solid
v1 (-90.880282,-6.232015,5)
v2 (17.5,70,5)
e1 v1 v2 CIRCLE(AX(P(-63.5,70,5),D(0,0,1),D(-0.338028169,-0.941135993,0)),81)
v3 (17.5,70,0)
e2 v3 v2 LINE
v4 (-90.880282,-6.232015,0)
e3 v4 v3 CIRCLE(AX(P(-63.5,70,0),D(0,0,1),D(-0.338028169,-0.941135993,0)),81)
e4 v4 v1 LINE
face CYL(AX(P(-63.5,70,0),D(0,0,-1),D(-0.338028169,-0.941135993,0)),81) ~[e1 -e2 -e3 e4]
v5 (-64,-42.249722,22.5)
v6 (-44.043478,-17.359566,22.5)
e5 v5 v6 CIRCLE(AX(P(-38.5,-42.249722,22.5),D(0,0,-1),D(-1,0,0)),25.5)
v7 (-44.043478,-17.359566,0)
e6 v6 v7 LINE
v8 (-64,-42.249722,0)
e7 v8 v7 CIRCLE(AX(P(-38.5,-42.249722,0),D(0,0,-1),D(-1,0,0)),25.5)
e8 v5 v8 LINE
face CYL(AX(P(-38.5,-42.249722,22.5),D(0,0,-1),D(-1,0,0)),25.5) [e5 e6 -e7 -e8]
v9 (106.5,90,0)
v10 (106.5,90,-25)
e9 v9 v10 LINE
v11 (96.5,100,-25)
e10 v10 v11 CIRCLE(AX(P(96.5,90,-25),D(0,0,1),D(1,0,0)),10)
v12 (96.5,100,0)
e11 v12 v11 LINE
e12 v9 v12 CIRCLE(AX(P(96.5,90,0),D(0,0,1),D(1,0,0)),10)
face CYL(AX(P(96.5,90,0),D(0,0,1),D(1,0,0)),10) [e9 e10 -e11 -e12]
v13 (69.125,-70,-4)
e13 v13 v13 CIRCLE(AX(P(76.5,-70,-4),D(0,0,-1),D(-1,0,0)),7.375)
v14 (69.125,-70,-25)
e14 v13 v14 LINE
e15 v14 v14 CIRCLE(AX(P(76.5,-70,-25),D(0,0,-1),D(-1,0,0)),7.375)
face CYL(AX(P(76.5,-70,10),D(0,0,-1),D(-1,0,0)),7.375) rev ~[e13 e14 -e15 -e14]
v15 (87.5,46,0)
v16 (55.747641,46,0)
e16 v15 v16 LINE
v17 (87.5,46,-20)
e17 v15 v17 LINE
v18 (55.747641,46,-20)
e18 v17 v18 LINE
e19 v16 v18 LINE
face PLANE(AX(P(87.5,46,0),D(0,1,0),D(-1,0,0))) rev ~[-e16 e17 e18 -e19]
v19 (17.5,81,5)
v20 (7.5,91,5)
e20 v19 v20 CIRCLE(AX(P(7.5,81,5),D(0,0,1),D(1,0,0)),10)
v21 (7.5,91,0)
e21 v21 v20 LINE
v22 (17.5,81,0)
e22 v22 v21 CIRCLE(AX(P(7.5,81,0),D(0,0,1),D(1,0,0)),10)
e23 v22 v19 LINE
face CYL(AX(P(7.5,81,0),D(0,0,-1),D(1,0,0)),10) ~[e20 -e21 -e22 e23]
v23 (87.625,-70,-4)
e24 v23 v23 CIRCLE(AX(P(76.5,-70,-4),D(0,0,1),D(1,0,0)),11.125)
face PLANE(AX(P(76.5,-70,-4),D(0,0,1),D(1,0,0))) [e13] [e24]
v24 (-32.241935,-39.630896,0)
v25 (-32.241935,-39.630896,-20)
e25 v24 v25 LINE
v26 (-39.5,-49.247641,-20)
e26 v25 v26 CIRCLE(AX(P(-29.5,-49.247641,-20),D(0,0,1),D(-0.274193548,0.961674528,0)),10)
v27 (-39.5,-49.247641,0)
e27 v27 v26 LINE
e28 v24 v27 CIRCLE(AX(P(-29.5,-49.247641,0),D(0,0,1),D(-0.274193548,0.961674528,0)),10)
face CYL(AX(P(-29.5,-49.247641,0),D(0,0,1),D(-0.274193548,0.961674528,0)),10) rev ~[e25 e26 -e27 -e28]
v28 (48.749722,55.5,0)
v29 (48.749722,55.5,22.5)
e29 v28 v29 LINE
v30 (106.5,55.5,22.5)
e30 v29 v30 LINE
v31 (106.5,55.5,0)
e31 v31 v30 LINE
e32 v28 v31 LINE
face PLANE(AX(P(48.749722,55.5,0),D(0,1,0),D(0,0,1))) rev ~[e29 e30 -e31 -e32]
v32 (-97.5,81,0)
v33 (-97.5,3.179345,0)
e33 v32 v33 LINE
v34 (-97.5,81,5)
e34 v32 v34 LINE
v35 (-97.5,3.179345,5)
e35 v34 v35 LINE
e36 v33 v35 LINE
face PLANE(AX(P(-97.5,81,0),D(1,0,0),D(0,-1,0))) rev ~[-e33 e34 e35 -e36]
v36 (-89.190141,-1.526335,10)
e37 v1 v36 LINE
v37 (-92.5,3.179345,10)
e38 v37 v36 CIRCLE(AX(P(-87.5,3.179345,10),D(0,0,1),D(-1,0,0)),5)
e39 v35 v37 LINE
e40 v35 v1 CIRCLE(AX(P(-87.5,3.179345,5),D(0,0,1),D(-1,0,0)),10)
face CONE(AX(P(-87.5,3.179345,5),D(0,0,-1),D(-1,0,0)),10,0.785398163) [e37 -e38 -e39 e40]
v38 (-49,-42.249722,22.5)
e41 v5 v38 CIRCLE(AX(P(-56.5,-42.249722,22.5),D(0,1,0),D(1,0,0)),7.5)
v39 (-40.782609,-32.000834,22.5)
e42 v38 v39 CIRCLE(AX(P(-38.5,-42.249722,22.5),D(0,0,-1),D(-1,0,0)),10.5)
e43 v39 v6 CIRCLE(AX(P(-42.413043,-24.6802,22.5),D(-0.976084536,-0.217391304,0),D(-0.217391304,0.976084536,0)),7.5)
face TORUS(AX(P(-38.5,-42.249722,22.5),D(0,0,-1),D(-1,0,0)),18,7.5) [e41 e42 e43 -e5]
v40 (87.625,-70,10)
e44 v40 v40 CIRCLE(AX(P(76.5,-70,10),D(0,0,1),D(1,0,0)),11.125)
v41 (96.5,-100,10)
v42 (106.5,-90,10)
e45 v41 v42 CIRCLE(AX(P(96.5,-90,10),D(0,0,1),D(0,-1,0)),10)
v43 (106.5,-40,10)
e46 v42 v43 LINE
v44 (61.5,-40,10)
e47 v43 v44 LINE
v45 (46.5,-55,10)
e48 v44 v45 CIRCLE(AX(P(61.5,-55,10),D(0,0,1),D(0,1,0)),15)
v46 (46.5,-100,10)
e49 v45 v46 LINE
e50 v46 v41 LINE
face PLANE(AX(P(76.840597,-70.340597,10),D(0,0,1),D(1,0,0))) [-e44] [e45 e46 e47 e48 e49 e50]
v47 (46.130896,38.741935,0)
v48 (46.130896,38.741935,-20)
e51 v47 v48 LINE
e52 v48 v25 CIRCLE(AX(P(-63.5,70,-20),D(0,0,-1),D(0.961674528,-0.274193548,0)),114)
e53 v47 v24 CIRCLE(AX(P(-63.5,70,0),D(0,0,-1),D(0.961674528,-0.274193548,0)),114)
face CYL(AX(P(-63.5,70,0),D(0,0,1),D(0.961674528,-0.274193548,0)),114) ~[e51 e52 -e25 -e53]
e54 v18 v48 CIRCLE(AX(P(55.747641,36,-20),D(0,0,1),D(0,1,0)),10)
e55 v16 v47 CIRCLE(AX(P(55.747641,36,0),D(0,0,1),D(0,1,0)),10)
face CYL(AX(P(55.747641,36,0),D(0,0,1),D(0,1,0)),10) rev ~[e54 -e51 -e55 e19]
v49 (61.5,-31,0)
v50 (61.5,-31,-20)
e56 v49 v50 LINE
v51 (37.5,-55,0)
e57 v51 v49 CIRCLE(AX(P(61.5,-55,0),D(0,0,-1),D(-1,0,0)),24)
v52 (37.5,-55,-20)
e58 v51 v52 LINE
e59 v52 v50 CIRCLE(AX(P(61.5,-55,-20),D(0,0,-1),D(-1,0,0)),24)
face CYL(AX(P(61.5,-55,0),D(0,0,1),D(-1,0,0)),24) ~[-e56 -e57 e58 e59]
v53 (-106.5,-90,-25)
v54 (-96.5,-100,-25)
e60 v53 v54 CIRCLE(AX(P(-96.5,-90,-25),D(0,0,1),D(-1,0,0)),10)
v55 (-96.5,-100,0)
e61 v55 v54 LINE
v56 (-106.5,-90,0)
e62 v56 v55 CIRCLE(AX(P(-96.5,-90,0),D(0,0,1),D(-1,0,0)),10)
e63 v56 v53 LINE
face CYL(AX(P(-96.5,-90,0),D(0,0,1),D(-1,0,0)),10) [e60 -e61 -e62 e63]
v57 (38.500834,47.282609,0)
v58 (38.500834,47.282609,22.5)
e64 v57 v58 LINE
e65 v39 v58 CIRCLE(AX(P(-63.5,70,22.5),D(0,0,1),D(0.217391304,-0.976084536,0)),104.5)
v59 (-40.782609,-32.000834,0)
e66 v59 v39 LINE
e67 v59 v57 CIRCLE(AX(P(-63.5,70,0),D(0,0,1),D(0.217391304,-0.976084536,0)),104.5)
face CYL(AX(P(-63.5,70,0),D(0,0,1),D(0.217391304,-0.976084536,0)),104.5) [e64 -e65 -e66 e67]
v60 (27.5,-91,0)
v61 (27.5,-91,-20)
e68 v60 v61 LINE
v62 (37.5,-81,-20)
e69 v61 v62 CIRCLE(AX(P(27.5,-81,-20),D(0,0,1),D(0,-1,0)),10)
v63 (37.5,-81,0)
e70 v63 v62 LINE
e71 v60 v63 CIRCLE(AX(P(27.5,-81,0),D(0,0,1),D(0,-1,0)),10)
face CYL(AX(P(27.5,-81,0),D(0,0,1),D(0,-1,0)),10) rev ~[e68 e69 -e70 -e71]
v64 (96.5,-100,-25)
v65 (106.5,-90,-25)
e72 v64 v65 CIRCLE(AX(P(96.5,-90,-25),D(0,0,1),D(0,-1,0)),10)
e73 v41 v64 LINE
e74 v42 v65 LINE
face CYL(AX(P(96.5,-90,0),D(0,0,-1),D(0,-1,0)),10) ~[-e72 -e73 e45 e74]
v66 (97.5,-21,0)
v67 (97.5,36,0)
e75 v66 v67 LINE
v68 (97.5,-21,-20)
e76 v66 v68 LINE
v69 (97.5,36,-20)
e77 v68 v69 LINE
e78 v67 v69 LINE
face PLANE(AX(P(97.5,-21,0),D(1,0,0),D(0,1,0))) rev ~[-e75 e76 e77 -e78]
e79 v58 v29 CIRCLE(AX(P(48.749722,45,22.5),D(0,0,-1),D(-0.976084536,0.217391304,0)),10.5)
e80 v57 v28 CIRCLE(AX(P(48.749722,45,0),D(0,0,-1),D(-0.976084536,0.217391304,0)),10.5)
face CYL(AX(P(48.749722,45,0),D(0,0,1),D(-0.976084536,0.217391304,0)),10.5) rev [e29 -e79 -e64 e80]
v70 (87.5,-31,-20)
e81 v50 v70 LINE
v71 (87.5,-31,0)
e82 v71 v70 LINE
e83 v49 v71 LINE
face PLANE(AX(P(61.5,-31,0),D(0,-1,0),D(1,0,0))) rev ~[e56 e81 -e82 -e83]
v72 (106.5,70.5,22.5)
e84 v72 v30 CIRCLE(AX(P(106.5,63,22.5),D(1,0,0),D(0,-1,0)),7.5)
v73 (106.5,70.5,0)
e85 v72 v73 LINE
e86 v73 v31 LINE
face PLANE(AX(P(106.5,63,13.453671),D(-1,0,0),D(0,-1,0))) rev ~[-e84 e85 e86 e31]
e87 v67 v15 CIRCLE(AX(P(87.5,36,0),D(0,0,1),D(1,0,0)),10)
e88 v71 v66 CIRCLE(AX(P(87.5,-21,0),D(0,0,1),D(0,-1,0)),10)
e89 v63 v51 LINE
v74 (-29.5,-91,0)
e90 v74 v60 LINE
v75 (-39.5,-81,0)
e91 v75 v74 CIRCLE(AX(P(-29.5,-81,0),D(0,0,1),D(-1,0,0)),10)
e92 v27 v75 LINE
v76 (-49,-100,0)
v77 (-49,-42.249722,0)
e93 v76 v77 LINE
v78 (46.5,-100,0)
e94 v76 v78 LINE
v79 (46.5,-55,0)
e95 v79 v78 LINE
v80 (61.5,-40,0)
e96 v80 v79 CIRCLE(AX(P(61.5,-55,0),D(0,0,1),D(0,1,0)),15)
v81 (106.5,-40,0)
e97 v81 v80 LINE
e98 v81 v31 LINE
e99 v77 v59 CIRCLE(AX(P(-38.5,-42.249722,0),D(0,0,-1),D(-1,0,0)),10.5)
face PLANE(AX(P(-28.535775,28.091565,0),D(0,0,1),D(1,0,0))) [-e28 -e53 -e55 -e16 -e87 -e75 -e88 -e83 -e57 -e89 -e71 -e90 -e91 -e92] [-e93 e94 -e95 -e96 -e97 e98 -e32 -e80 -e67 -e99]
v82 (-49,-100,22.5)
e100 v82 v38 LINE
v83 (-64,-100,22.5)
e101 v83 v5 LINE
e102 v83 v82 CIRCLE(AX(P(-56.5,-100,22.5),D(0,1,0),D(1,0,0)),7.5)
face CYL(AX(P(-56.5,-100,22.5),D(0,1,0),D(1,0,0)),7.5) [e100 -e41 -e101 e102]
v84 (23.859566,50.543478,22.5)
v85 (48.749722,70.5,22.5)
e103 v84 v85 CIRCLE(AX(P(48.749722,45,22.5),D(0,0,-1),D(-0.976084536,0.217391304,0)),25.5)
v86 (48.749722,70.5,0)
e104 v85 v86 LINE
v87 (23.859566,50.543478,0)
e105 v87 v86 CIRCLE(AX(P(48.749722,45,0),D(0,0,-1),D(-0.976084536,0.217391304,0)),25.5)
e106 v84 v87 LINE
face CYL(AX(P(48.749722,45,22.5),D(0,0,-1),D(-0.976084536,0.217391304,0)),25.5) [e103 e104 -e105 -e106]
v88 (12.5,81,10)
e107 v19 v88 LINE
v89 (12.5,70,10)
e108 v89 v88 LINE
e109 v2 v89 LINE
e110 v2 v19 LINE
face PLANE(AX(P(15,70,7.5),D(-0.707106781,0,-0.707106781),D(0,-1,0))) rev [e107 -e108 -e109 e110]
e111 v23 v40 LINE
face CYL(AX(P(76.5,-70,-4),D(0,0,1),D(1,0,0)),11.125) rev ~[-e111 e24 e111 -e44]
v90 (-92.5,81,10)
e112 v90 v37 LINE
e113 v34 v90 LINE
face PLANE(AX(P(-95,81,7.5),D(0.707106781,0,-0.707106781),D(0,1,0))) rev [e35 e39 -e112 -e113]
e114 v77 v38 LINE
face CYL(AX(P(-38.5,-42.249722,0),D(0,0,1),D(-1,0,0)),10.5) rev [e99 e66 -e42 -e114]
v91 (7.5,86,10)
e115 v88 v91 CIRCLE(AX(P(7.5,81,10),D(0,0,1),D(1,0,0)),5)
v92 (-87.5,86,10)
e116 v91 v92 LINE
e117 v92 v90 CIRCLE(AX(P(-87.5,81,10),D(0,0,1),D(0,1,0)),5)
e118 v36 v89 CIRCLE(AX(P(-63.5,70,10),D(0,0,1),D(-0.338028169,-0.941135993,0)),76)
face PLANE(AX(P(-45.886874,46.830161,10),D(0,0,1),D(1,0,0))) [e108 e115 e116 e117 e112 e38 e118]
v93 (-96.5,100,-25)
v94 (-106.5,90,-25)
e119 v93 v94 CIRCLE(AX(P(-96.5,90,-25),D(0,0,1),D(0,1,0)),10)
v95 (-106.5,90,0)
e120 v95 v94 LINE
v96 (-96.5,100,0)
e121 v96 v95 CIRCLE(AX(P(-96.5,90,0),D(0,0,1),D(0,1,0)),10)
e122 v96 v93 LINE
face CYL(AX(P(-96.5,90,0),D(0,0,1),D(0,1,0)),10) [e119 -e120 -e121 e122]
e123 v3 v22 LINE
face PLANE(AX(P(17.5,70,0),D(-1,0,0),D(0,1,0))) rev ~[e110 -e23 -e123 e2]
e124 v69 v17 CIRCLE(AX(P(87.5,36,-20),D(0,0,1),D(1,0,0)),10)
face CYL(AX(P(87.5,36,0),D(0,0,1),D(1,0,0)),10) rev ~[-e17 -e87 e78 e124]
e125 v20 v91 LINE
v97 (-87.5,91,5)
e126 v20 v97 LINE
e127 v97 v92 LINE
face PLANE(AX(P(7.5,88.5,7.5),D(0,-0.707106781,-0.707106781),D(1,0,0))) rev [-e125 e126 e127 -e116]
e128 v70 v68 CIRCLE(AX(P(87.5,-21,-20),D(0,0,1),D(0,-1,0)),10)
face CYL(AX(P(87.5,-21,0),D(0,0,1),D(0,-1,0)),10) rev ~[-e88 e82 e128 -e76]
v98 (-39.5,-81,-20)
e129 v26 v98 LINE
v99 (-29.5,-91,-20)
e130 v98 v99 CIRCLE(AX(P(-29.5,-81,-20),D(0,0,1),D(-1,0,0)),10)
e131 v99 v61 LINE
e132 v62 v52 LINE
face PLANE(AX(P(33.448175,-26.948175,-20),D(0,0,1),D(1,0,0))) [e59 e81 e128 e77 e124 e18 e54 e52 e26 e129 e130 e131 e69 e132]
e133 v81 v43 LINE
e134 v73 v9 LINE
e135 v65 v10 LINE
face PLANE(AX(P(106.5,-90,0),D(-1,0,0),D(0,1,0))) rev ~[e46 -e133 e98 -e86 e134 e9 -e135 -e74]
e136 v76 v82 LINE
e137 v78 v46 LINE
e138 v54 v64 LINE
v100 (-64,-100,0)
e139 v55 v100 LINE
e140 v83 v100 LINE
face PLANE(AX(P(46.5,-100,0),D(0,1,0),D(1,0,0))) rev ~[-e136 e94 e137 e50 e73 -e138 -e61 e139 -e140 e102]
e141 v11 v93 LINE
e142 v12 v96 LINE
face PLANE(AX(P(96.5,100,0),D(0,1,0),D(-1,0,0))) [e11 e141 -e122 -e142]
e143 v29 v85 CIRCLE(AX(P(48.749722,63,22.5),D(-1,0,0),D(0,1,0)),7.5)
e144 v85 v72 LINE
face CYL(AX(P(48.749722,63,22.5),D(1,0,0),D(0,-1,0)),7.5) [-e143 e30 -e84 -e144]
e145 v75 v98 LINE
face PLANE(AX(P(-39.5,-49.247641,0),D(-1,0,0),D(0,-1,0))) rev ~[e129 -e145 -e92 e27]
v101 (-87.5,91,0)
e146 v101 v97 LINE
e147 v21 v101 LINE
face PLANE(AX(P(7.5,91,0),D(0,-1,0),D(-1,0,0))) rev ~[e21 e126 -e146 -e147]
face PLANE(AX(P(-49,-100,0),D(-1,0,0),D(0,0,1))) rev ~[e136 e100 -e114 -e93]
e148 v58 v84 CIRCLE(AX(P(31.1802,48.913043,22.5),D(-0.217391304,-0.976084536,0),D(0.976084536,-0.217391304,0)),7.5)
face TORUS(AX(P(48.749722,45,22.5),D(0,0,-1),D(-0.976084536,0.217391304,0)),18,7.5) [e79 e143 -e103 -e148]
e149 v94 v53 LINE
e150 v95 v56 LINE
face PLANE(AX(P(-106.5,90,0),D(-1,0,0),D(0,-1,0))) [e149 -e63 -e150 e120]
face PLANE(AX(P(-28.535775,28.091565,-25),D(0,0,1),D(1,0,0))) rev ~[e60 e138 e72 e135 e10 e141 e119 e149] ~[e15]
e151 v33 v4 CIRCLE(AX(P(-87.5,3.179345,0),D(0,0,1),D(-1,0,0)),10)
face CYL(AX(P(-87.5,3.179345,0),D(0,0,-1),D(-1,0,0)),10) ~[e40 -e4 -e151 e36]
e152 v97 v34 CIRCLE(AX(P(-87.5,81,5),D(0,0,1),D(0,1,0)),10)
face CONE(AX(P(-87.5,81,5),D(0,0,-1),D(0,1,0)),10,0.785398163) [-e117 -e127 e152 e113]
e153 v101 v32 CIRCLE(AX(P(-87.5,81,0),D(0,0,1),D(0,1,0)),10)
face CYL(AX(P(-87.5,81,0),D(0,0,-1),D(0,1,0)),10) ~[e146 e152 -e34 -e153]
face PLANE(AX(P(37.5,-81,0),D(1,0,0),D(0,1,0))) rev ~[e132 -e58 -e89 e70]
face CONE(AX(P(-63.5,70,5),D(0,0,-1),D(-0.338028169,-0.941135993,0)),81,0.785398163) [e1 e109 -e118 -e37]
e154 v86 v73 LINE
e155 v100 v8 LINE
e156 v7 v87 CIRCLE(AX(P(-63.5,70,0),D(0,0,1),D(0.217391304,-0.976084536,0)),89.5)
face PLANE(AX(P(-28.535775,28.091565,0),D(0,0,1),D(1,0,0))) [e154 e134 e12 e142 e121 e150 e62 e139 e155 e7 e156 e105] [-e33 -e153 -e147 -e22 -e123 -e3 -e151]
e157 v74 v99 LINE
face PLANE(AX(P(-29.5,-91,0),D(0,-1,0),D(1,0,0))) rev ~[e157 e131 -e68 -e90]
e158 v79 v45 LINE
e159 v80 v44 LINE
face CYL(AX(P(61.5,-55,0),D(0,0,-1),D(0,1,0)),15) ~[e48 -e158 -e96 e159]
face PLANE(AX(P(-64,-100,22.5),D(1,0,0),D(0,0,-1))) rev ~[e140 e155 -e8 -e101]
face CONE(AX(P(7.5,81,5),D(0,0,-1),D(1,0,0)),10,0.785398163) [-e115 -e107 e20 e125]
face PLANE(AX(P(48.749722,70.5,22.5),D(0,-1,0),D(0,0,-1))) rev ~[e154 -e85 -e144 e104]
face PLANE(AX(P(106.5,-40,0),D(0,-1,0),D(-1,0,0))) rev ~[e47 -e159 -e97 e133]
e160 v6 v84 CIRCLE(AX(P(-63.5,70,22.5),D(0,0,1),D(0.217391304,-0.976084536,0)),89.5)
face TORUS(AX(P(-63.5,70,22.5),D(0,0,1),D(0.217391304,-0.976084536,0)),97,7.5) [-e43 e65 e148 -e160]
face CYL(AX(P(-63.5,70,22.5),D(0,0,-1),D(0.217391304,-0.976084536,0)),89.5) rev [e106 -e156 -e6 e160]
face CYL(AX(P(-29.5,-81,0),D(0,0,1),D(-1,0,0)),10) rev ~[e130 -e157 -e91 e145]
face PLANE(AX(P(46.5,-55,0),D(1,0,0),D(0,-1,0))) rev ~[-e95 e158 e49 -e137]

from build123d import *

# Parameters (mm, degrees)
F1_DEPTH       = 25
F2_DEPTH       = 10
F3_DEPTH       = 10
F4_DEPTH       = 20
F6_D           = 14.75
F6_CBORE_D     = 22.25
F6_CBORE_DEPTH = 14
F9_SIZE        = 5


with BuildPart() as f1:
    # F0 (on Top) → F1 (new body)
    with BuildSketch(Plane.XY):
        with BuildLine():
            Line((96.5, 100), (-96.5, 100))
            ThreePointArc((-96.5, 100), (-103.5710678119, 97.0710678119), (-106.5, 90))
            Line((-106.5, 90), (-106.5, -90))
            ThreePointArc((-106.5, -90), (-103.5710678119, -97.0710678119), (-96.5, -100))
            Line((-96.5, -100), (-63.5, -100))
            Line((-63.5, -100), (-63.5, -42.2497216032))
            ThreePointArc((-63.5, -42.2497216032), (-58.0047374401, -26.6111405489), (-43.9347826087, -17.8476082112))
            ThreePointArc((-43.9347826087, -17.8476082112), (0.1396103068, 6.3603896932), (24.3476082112, 50.4347826087))
            ThreePointArc((24.3476082112, 50.4347826087), (33.1111405489, 64.5047374401), (48.7497216032, 70))
            Line((48.7497216032, 70), (106.5, 70))
            Line((106.5, 70), (106.5, 90))
            ThreePointArc((106.5, 90), (103.5710678119, 97.0710678119), (96.5, 100))
        make_face()
        with BuildLine():
            ThreePointArc((17.5, 70), (-16.8995859294, 3.7474422497), (-90.8802816901, -6.2320154172))
            ThreePointArc((-90.8802816901, -6.2320154172), (-95.6793281173, -2.5737930287), (-97.5, 3.1793445108))
            Line((-97.5, 3.1793445108), (-97.5, 81))
            ThreePointArc((-97.5, 81), (-94.5710678119, 88.0710678119), (-87.5, 91))
            Line((-87.5, 91), (7.5, 91))
            ThreePointArc((7.5, 91), (14.5710678119, 88.0710678119), (17.5, 81))
            Line((17.5, 81), (17.5, 70))
        make_face(mode=Mode.SUBTRACT)
        with BuildLine():
            Line((106.5, 55), (106.5, 70))
            Line((106.5, 70), (48.7497216032, 70))
            ThreePointArc((48.7497216032, 70), (33.1111405489, 64.5047374401), (24.3476082112, 50.4347826087))
            ThreePointArc((24.3476082112, 50.4347826087), (0.1396103068, 6.3603896932), (-43.9347826087, -17.8476082112))
            ThreePointArc((-43.9347826087, -17.8476082112), (-58.0047374401, -26.6111405489), (-63.5, -42.2497216032))
            Line((-63.5, -42.2497216032), (-63.5, -100))
            Line((-63.5, -100), (-48.5, -100))
            Line((-48.5, -100), (-48.5, -42.2497216032))
            ThreePointArc((-48.5, -42.2497216032), (-46.3018949761, -35.9942891815), (-40.6739130435, -32.4888762464))
            ThreePointArc((-40.6739130435, -32.4888762464), (10.7462120246, -4.2462120246), (38.9888762464, 47.1739130435))
            ThreePointArc((38.9888762464, 47.1739130435), (42.4942891815, 52.8018949761), (48.7497216032, 55))
            Line((48.7497216032, 55), (106.5, 55))
        make_face()
        with BuildLine():
            Line((106.5, -40), (106.5, 55))
            Line((106.5, 55), (48.7497216032, 55))
            ThreePointArc((48.7497216032, 55), (42.4942891815, 52.8018949761), (38.9888762464, 47.1739130435))
            ThreePointArc((38.9888762464, 47.1739130435), (10.7462120246, -4.2462120246), (-40.6739130435, -32.4888762464))
            ThreePointArc((-40.6739130435, -32.4888762464), (-46.3018949761, -35.9942891815), (-48.5, -42.2497216032))
            Line((-48.5, -42.2497216032), (-48.5, -100))
            Line((-48.5, -100), (46.5, -100))
            Line((46.5, -100), (46.5, -55))
            ThreePointArc((46.5, -55), (50.8933982822, -44.3933982822), (61.5, -40))
            Line((61.5, -40), (106.5, -40))
        make_face()
        with BuildLine():
            Line((87.5, -31), (61.5, -31))
            ThreePointArc((61.5, -31), (44.5294372515, -38.0294372515), (37.5, -55))
            Line((37.5, -55), (37.5, -81))
            ThreePointArc((37.5, -81), (34.5710678119, -88.0710678119), (27.5, -91))
            Line((27.5, -91), (-29.5, -91))
            ThreePointArc((-29.5, -91), (-36.5710678119, -88.0710678119), (-39.5, -81))
            Line((-39.5, -81), (-39.5, -49.2476414861))
            ThreePointArc((-39.5, -49.2476414861), (-37.481834214, -43.2234965193), (-32.2419354839, -39.630896205))
            ThreePointArc((-32.2419354839, -39.630896205), (17.1101730553, -10.6101730553), (46.130896205, 38.7419354839))
            ThreePointArc((46.130896205, 38.7419354839), (49.7234965193, 43.981834214), (55.7476414861, 46))
            Line((55.7476414861, 46), (87.5, 46))
            ThreePointArc((87.5, 46), (94.5710678119, 43.0710678119), (97.5, 36))
            Line((97.5, 36), (97.5, -21))
            ThreePointArc((97.5, -21), (94.5710678119, -28.0710678119), (87.5, -31))
        make_face(mode=Mode.SUBTRACT)
        with BuildLine():
            Line((106.5, -90), (106.5, -40))
            Line((106.5, -40), (61.5, -40))
            ThreePointArc((61.5, -40), (50.8933982822, -44.3933982822), (46.5, -55))
            Line((46.5, -55), (46.5, -100))
            Line((46.5, -100), (96.5, -100))
            ThreePointArc((96.5, -100), (103.5710678119, -97.0710678119), (106.5, -90))
        make_face()
        with BuildLine():
            ThreePointArc((-97.5, 3.1793445108), (-95.6793281173, -2.5737930287), (-90.8802816901, -6.2320154172))
            ThreePointArc((-90.8802816901, -6.2320154172), (-16.8995859294, 3.7474422497), (17.5, 70))
            Line((17.5, 70), (17.5, 81))
            ThreePointArc((17.5, 81), (14.5710678119, 88.0710678119), (7.5, 91))
            Line((7.5, 91), (-87.5, 91))
            ThreePointArc((-87.5, 91), (-94.5710678119, 88.0710678119), (-97.5, 81))
            Line((-97.5, 81), (-97.5, 3.1793445108))
        make_face()
        with BuildLine():
            ThreePointArc((37.5, -55), (44.5294372515, -38.0294372515), (61.5, -31))
            Line((61.5, -31), (87.5, -31))
            ThreePointArc((87.5, -31), (94.5710678119, -28.0710678119), (97.5, -21))
            Line((97.5, -21), (97.5, 36))
            ThreePointArc((97.5, 36), (94.5710678119, 43.0710678119), (87.5, 46))
            Line((87.5, 46), (55.7476414861, 46))
            ThreePointArc((55.7476414861, 46), (49.7234965193, 43.981834214), (46.130896205, 38.7419354839))
            ThreePointArc((46.130896205, 38.7419354839), (17.1101730553, -10.6101730553), (-32.2419354839, -39.630896205))
            ThreePointArc((-32.2419354839, -39.630896205), (-37.481834214, -43.2234965193), (-39.5, -49.2476414861))
            Line((-39.5, -49.2476414861), (-39.5, -81))
            ThreePointArc((-39.5, -81), (-36.5710678119, -88.0710678119), (-29.5, -91))
            Line((-29.5, -91), (27.5, -91))
            ThreePointArc((27.5, -91), (34.5710678119, -88.0710678119), (37.5, -81))
            Line((37.5, -81), (37.5, -55))
        make_face()
    extrude(amount=-F1_DEPTH)

    # F0 (on Top) → F2 (join)
    with BuildSketch(Plane.XY):
        with BuildLine():
            Line((106.5, -90), (106.5, -40))
            Line((106.5, -40), (61.5, -40))
            ThreePointArc((61.5, -40), (50.8933982822, -44.3933982822), (46.5, -55))
            Line((46.5, -55), (46.5, -100))
            Line((46.5, -100), (96.5, -100))
            ThreePointArc((96.5, -100), (103.5710678119, -97.0710678119), (106.5, -90))
        make_face()
    extrude(amount=F2_DEPTH)

    # F0 (on Top) → F3 (join)
    with BuildSketch(Plane.XY):
        with BuildLine():
            ThreePointArc((-97.5, 3.1793445108), (-95.6793281173, -2.5737930287), (-90.8802816901, -6.2320154172))
            ThreePointArc((-90.8802816901, -6.2320154172), (-16.8995859294, 3.7474422497), (17.5, 70))
            Line((17.5, 70), (17.5, 81))
            ThreePointArc((17.5, 81), (14.5710678119, 88.0710678119), (7.5, 91))
            Line((7.5, 91), (-87.5, 91))
            ThreePointArc((-87.5, 91), (-94.5710678119, 88.0710678119), (-97.5, 81))
            Line((-97.5, 81), (-97.5, 3.1793445108))
        make_face()
    extrude(amount=F3_DEPTH)

    # F0 (on Top) → F4 (cut)
    with BuildSketch(Plane.XY):
        with BuildLine():
            ThreePointArc((37.5, -55), (44.5294372515, -38.0294372515), (61.5, -31))
            Line((61.5, -31), (87.5, -31))
            ThreePointArc((87.5, -31), (94.5710678119, -28.0710678119), (97.5, -21))
            Line((97.5, -21), (97.5, 36))
            ThreePointArc((97.5, 36), (94.5710678119, 43.0710678119), (87.5, 46))
            Line((87.5, 46), (55.7476414861, 46))
            ThreePointArc((55.7476414861, 46), (49.7234965193, 43.981834214), (46.130896205, 38.7419354839))
            ThreePointArc((46.130896205, 38.7419354839), (17.1101730553, -10.6101730553), (-32.2419354839, -39.630896205))
            ThreePointArc((-32.2419354839, -39.630896205), (-37.481834214, -43.2234965193), (-39.5, -49.2476414861))
            Line((-39.5, -49.2476414861), (-39.5, -81))
            ThreePointArc((-39.5, -81), (-36.5710678119, -88.0710678119), (-29.5, -91))
            Line((-29.5, -91), (27.5, -91))
            ThreePointArc((27.5, -91), (34.5710678119, -88.0710678119), (37.5, -81))
            Line((37.5, -81), (37.5, -55))
        make_face()
    extrude(amount=-F4_DEPTH, mode=Mode.SUBTRACT)

    # F6 (through all)
    with Locations(Plane.XY.offset(10)):
        with Locations((76.5, -70)):
            CounterBoreHole(F6_D / 2, F6_CBORE_D / 2, F6_CBORE_DEPTH)

    # F8: sweep along a path in F0
    with BuildLine(Plane.XY) as f8_path:
        Line((-48.5, -100), (-48.5, -42.2497216032))
        ThreePointArc((-48.5, -42.2497216032), (-46.3018949761, -35.9942891815), (-40.6739130435, -32.4888762464))
        ThreePointArc((-40.6739130435, -32.4888762464), (10.7462120246, -4.2462120246), (38.9888762464, 47.1739130435))
        ThreePointArc((38.9888762464, 47.1739130435), (42.4942891815, 52.8018949761), (48.7497216032, 55))
        Line((48.7497216032, 55), (106.5, 55))
    # F7 (on face) → F8 (sweep)
    with BuildSketch(Plane.XZ.offset(100)):
        with BuildLine():
            Line((-64, 0), (-49, 0))
            Line((-49, 0), (-49, 22.5))
            ThreePointArc((-49, 22.5), (-56.5, 30), (-64, 22.5))
            Line((-64, 22.5), (-64, 0))
        make_face()
    sweep(path=f8_path.line)

    # F9
    f9_edges = [f1.edges().sort_by_distance(p)[0] for p in [
        (-97.5, 42.089672, 10),
    ]]
    chamfer(f9_edges, length=F9_SIZE)


solid = f1.part
